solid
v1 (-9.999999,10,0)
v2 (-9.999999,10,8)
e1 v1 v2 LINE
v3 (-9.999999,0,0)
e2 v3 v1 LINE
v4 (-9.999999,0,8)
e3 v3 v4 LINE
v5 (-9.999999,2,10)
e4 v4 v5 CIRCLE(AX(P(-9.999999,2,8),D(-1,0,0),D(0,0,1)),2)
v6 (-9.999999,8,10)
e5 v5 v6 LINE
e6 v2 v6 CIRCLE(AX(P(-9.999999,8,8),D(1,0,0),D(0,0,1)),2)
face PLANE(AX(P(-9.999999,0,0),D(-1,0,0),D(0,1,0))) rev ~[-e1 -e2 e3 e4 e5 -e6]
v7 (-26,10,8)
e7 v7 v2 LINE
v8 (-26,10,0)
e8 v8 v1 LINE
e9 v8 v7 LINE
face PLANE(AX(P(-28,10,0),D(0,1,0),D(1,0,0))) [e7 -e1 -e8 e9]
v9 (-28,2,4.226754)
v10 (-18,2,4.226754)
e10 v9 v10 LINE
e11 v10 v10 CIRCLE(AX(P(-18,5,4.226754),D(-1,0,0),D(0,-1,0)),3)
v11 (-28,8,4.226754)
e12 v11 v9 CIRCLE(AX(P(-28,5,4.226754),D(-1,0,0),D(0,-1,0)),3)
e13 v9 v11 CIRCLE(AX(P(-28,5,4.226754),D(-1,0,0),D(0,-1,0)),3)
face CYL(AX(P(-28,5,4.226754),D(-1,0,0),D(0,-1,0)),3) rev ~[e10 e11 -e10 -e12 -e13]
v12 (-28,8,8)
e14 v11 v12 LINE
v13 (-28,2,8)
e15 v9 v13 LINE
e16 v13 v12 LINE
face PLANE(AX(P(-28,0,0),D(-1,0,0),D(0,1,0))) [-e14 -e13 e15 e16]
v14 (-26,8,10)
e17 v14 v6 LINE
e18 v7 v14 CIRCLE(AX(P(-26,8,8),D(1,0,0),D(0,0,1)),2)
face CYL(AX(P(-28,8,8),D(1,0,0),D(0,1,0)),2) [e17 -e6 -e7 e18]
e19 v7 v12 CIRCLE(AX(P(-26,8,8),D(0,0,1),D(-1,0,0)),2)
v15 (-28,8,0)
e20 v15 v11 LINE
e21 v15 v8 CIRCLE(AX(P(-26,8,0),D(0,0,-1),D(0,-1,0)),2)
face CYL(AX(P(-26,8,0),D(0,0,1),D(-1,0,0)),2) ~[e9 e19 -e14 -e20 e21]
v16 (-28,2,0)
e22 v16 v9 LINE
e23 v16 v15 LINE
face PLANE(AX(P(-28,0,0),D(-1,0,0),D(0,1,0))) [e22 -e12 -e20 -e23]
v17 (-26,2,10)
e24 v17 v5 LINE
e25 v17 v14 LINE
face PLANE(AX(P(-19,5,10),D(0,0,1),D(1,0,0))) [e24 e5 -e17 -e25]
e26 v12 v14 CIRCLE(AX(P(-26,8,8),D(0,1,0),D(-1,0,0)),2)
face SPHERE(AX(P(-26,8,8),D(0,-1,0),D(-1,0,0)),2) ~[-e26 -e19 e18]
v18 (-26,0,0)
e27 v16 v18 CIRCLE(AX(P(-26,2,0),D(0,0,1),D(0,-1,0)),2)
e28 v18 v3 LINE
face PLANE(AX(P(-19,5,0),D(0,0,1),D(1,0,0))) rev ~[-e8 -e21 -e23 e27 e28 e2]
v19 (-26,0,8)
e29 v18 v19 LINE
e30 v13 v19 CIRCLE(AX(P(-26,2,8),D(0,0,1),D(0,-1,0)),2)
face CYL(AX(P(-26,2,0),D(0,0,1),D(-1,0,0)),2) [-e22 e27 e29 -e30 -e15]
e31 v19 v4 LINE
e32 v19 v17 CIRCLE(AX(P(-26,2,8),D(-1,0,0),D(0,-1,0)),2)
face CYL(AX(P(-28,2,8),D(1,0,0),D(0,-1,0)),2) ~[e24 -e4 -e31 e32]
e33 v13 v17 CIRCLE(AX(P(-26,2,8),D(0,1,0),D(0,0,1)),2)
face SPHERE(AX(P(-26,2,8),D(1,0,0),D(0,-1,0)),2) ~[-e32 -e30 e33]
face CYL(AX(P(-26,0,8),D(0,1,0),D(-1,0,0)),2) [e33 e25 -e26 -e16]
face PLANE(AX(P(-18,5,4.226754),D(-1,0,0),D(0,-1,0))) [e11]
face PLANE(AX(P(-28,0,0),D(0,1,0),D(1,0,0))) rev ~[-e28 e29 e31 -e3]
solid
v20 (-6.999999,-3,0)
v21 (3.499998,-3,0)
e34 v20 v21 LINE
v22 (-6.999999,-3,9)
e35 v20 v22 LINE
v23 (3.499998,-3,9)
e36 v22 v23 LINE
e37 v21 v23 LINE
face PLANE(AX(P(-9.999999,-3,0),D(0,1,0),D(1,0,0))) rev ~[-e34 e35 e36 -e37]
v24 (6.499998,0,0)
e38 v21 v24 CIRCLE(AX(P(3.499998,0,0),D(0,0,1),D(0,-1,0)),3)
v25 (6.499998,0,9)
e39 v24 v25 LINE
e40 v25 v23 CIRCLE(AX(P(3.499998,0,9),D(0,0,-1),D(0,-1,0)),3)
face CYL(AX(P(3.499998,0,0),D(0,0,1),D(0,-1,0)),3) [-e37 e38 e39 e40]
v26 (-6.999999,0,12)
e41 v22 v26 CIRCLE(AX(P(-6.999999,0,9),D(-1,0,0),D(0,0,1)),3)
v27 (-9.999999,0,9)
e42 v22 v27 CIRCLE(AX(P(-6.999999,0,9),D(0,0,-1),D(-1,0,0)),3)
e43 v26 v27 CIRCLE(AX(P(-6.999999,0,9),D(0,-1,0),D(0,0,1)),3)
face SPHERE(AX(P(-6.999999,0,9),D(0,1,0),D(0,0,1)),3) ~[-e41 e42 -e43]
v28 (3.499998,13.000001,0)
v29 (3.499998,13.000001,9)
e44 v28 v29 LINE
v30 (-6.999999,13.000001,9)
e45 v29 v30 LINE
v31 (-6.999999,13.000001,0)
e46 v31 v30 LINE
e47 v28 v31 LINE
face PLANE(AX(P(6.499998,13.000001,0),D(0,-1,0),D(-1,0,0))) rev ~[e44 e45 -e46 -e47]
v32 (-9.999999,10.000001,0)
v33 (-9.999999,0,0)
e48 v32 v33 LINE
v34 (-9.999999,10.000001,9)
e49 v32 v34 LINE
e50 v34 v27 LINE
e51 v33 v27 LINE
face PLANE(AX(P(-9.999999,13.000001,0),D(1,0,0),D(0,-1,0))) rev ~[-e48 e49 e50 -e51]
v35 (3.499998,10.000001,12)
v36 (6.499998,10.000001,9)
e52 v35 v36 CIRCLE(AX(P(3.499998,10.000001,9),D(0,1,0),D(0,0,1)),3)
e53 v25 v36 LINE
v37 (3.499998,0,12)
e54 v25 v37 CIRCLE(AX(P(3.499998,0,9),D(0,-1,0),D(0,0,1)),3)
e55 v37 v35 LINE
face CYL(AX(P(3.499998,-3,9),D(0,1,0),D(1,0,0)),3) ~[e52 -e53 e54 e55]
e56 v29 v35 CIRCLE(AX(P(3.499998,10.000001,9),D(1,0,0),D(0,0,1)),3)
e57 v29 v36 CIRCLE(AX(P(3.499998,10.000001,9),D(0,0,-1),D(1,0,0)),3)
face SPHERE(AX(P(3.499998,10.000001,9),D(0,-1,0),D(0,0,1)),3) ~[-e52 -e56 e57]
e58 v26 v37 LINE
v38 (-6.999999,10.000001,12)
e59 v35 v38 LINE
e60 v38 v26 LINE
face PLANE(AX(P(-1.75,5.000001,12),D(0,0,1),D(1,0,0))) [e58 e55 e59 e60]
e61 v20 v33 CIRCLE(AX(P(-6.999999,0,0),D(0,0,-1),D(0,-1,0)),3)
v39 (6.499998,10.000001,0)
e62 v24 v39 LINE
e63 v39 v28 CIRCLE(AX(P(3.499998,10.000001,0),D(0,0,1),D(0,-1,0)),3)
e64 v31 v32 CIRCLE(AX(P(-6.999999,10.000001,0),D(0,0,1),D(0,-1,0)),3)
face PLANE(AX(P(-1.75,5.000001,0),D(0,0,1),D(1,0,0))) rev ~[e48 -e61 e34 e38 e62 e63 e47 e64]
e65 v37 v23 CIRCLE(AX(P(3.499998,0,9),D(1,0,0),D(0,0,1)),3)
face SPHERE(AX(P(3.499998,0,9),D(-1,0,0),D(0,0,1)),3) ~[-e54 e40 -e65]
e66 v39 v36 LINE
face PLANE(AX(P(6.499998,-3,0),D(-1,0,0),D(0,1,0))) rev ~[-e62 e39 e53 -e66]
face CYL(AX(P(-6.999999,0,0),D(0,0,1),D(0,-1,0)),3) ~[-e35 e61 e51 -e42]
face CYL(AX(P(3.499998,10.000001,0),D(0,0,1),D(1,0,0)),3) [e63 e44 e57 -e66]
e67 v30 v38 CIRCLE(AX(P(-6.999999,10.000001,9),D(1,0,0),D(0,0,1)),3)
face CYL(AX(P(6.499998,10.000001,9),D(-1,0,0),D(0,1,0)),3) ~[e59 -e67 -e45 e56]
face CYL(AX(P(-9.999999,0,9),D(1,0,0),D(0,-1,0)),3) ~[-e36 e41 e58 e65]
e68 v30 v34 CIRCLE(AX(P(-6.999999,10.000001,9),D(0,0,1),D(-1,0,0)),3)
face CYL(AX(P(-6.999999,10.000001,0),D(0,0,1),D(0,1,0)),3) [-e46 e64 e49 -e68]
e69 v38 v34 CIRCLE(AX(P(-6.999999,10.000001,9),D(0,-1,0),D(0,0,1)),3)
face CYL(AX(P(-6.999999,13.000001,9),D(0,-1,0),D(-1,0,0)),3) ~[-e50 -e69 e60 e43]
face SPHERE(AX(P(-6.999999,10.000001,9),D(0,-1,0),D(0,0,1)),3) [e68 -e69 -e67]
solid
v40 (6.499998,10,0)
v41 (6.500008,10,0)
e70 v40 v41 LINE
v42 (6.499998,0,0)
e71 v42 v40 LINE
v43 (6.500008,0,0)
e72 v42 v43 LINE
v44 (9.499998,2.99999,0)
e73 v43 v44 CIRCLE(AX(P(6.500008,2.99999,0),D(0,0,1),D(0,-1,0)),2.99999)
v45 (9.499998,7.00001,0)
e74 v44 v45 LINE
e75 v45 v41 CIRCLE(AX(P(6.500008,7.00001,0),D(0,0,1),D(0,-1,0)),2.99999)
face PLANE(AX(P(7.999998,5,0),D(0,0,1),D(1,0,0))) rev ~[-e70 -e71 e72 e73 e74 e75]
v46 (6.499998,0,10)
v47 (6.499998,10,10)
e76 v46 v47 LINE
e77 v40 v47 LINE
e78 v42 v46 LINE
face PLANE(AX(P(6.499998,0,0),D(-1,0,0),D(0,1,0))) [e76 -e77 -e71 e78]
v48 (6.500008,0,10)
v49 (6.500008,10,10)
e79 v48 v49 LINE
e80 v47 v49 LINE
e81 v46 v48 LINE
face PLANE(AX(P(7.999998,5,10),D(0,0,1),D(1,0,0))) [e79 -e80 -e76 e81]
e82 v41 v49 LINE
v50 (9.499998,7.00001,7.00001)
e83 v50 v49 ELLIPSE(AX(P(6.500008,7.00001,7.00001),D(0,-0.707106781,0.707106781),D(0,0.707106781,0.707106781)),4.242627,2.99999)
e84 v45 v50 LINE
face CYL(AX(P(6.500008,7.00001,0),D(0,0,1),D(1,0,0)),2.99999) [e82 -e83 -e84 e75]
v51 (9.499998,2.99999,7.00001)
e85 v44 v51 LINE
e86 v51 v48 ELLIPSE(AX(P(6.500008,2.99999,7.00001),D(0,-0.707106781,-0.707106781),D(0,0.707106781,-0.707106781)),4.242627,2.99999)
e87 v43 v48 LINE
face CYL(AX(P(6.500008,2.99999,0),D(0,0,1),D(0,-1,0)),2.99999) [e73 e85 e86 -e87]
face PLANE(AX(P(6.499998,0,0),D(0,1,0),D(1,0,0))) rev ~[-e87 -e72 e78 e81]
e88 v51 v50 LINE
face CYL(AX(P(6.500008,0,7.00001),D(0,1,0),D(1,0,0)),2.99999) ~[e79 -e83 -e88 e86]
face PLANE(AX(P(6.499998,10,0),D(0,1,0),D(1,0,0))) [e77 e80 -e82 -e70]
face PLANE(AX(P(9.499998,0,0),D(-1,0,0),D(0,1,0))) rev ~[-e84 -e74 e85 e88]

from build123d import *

# Parameters (mm, degrees)
F0_W     = 18.0000008929
F0_H     = 10
F1_DEPTH = 10
F0_W_2   = 3
F2_DEPTH = 12
F3_R     = 2
F4_R     = 3
F5_R     = 2.99999
F7_DEPTH = 10


# Not quite as in the source:
# - a fillet or chamfer is up to 0.001 mm smaller than in the source, because OpenCascade refuses the exact size


with BuildPart() as f1:
    # F0 (on Top) → F1 (new body)
    with BuildSketch(Plane.XY):
        with Locations((-18.9999995536, 5)):
            Rectangle(F0_W, F0_H)
    extrude(amount=F1_DEPTH)

    # F3
    f3_edges = [f1.edges().sort_by_distance(p)[0] for p in [
        (-19, 0, 10),
        (-28, 0, 5),
        (-28, 5, 10),
        (-28, 10, 5),
        (-19, 10, 10),
    ]]
    fillet(f3_edges, radius=F3_R)

    # F6 (on face) → F7 (cut)
    with BuildSketch(Plane(origin=(-28, 0, 0), x_dir=(0, -1, 0), z_dir=(-1, 0, 0))):
        with BuildLine():
            ThreePointArc((-8, 4.2267539538), (-5, 1.2267539538), (-2, 4.2267539538))
            ThreePointArc((-2, 4.2267539538), (-5, 7.2267539538), (-8, 4.2267539538))
        make_face()
    extrude(amount=-F7_DEPTH, mode=Mode.SUBTRACT)


with BuildPart() as f1b:
    # F0 (on Top) → F1, piece 2 (new body)
    with BuildSketch(Plane.XY):
        with Locations((7.9999984374, 5)):
            Rectangle(F0_W_2, F0_H)
    extrude(amount=F1_DEPTH)

    # F5 (radius 3 in the source; OpenCascade refuses exactly that, so slightly less here)
    f5_edges = [f1b.edges().sort_by_distance(p)[0] for p in [
        (9.499998, 5, 10),
        (9.499998, 0, 5),
        (9.499998, 10, 5),
    ]]
    fillet(f5_edges, radius=F5_R)


with BuildPart() as f2:
    # F0 (on Top) → F2 (new body)
    with BuildSketch(Plane.XY):
        Polygon((-9.9999991071, 10), (-9.9999991071, 0), (-9.9999991071, -3.0000002232), (6.4999984374, -3.0000002232), (6.4999984374, 0), (6.4999984374, 10), (6.4999984374, 13.0000013393), (-9.9999991071, 13.0000013393), align=None)
    extrude(amount=F2_DEPTH)

    # F4
    f4_edges = [f2.edges().sort_by_distance(p)[0] for p in [
        (-9.999999, 5.000001, 12),
        (-1.75, -3, 12),
        (6.499998, 5.000001, 12),
        (-1.75, 13.000001, 12),
        (6.499998, -3, 6),
        (-9.999999, -3, 6),
        (-9.999999, 13.000001, 6),
        (6.499998, 13.000001, 6),
    ]]
    fillet(f4_edges, radius=F4_R)


solid = Compound([f1.part, f1b.part, f2.part])
